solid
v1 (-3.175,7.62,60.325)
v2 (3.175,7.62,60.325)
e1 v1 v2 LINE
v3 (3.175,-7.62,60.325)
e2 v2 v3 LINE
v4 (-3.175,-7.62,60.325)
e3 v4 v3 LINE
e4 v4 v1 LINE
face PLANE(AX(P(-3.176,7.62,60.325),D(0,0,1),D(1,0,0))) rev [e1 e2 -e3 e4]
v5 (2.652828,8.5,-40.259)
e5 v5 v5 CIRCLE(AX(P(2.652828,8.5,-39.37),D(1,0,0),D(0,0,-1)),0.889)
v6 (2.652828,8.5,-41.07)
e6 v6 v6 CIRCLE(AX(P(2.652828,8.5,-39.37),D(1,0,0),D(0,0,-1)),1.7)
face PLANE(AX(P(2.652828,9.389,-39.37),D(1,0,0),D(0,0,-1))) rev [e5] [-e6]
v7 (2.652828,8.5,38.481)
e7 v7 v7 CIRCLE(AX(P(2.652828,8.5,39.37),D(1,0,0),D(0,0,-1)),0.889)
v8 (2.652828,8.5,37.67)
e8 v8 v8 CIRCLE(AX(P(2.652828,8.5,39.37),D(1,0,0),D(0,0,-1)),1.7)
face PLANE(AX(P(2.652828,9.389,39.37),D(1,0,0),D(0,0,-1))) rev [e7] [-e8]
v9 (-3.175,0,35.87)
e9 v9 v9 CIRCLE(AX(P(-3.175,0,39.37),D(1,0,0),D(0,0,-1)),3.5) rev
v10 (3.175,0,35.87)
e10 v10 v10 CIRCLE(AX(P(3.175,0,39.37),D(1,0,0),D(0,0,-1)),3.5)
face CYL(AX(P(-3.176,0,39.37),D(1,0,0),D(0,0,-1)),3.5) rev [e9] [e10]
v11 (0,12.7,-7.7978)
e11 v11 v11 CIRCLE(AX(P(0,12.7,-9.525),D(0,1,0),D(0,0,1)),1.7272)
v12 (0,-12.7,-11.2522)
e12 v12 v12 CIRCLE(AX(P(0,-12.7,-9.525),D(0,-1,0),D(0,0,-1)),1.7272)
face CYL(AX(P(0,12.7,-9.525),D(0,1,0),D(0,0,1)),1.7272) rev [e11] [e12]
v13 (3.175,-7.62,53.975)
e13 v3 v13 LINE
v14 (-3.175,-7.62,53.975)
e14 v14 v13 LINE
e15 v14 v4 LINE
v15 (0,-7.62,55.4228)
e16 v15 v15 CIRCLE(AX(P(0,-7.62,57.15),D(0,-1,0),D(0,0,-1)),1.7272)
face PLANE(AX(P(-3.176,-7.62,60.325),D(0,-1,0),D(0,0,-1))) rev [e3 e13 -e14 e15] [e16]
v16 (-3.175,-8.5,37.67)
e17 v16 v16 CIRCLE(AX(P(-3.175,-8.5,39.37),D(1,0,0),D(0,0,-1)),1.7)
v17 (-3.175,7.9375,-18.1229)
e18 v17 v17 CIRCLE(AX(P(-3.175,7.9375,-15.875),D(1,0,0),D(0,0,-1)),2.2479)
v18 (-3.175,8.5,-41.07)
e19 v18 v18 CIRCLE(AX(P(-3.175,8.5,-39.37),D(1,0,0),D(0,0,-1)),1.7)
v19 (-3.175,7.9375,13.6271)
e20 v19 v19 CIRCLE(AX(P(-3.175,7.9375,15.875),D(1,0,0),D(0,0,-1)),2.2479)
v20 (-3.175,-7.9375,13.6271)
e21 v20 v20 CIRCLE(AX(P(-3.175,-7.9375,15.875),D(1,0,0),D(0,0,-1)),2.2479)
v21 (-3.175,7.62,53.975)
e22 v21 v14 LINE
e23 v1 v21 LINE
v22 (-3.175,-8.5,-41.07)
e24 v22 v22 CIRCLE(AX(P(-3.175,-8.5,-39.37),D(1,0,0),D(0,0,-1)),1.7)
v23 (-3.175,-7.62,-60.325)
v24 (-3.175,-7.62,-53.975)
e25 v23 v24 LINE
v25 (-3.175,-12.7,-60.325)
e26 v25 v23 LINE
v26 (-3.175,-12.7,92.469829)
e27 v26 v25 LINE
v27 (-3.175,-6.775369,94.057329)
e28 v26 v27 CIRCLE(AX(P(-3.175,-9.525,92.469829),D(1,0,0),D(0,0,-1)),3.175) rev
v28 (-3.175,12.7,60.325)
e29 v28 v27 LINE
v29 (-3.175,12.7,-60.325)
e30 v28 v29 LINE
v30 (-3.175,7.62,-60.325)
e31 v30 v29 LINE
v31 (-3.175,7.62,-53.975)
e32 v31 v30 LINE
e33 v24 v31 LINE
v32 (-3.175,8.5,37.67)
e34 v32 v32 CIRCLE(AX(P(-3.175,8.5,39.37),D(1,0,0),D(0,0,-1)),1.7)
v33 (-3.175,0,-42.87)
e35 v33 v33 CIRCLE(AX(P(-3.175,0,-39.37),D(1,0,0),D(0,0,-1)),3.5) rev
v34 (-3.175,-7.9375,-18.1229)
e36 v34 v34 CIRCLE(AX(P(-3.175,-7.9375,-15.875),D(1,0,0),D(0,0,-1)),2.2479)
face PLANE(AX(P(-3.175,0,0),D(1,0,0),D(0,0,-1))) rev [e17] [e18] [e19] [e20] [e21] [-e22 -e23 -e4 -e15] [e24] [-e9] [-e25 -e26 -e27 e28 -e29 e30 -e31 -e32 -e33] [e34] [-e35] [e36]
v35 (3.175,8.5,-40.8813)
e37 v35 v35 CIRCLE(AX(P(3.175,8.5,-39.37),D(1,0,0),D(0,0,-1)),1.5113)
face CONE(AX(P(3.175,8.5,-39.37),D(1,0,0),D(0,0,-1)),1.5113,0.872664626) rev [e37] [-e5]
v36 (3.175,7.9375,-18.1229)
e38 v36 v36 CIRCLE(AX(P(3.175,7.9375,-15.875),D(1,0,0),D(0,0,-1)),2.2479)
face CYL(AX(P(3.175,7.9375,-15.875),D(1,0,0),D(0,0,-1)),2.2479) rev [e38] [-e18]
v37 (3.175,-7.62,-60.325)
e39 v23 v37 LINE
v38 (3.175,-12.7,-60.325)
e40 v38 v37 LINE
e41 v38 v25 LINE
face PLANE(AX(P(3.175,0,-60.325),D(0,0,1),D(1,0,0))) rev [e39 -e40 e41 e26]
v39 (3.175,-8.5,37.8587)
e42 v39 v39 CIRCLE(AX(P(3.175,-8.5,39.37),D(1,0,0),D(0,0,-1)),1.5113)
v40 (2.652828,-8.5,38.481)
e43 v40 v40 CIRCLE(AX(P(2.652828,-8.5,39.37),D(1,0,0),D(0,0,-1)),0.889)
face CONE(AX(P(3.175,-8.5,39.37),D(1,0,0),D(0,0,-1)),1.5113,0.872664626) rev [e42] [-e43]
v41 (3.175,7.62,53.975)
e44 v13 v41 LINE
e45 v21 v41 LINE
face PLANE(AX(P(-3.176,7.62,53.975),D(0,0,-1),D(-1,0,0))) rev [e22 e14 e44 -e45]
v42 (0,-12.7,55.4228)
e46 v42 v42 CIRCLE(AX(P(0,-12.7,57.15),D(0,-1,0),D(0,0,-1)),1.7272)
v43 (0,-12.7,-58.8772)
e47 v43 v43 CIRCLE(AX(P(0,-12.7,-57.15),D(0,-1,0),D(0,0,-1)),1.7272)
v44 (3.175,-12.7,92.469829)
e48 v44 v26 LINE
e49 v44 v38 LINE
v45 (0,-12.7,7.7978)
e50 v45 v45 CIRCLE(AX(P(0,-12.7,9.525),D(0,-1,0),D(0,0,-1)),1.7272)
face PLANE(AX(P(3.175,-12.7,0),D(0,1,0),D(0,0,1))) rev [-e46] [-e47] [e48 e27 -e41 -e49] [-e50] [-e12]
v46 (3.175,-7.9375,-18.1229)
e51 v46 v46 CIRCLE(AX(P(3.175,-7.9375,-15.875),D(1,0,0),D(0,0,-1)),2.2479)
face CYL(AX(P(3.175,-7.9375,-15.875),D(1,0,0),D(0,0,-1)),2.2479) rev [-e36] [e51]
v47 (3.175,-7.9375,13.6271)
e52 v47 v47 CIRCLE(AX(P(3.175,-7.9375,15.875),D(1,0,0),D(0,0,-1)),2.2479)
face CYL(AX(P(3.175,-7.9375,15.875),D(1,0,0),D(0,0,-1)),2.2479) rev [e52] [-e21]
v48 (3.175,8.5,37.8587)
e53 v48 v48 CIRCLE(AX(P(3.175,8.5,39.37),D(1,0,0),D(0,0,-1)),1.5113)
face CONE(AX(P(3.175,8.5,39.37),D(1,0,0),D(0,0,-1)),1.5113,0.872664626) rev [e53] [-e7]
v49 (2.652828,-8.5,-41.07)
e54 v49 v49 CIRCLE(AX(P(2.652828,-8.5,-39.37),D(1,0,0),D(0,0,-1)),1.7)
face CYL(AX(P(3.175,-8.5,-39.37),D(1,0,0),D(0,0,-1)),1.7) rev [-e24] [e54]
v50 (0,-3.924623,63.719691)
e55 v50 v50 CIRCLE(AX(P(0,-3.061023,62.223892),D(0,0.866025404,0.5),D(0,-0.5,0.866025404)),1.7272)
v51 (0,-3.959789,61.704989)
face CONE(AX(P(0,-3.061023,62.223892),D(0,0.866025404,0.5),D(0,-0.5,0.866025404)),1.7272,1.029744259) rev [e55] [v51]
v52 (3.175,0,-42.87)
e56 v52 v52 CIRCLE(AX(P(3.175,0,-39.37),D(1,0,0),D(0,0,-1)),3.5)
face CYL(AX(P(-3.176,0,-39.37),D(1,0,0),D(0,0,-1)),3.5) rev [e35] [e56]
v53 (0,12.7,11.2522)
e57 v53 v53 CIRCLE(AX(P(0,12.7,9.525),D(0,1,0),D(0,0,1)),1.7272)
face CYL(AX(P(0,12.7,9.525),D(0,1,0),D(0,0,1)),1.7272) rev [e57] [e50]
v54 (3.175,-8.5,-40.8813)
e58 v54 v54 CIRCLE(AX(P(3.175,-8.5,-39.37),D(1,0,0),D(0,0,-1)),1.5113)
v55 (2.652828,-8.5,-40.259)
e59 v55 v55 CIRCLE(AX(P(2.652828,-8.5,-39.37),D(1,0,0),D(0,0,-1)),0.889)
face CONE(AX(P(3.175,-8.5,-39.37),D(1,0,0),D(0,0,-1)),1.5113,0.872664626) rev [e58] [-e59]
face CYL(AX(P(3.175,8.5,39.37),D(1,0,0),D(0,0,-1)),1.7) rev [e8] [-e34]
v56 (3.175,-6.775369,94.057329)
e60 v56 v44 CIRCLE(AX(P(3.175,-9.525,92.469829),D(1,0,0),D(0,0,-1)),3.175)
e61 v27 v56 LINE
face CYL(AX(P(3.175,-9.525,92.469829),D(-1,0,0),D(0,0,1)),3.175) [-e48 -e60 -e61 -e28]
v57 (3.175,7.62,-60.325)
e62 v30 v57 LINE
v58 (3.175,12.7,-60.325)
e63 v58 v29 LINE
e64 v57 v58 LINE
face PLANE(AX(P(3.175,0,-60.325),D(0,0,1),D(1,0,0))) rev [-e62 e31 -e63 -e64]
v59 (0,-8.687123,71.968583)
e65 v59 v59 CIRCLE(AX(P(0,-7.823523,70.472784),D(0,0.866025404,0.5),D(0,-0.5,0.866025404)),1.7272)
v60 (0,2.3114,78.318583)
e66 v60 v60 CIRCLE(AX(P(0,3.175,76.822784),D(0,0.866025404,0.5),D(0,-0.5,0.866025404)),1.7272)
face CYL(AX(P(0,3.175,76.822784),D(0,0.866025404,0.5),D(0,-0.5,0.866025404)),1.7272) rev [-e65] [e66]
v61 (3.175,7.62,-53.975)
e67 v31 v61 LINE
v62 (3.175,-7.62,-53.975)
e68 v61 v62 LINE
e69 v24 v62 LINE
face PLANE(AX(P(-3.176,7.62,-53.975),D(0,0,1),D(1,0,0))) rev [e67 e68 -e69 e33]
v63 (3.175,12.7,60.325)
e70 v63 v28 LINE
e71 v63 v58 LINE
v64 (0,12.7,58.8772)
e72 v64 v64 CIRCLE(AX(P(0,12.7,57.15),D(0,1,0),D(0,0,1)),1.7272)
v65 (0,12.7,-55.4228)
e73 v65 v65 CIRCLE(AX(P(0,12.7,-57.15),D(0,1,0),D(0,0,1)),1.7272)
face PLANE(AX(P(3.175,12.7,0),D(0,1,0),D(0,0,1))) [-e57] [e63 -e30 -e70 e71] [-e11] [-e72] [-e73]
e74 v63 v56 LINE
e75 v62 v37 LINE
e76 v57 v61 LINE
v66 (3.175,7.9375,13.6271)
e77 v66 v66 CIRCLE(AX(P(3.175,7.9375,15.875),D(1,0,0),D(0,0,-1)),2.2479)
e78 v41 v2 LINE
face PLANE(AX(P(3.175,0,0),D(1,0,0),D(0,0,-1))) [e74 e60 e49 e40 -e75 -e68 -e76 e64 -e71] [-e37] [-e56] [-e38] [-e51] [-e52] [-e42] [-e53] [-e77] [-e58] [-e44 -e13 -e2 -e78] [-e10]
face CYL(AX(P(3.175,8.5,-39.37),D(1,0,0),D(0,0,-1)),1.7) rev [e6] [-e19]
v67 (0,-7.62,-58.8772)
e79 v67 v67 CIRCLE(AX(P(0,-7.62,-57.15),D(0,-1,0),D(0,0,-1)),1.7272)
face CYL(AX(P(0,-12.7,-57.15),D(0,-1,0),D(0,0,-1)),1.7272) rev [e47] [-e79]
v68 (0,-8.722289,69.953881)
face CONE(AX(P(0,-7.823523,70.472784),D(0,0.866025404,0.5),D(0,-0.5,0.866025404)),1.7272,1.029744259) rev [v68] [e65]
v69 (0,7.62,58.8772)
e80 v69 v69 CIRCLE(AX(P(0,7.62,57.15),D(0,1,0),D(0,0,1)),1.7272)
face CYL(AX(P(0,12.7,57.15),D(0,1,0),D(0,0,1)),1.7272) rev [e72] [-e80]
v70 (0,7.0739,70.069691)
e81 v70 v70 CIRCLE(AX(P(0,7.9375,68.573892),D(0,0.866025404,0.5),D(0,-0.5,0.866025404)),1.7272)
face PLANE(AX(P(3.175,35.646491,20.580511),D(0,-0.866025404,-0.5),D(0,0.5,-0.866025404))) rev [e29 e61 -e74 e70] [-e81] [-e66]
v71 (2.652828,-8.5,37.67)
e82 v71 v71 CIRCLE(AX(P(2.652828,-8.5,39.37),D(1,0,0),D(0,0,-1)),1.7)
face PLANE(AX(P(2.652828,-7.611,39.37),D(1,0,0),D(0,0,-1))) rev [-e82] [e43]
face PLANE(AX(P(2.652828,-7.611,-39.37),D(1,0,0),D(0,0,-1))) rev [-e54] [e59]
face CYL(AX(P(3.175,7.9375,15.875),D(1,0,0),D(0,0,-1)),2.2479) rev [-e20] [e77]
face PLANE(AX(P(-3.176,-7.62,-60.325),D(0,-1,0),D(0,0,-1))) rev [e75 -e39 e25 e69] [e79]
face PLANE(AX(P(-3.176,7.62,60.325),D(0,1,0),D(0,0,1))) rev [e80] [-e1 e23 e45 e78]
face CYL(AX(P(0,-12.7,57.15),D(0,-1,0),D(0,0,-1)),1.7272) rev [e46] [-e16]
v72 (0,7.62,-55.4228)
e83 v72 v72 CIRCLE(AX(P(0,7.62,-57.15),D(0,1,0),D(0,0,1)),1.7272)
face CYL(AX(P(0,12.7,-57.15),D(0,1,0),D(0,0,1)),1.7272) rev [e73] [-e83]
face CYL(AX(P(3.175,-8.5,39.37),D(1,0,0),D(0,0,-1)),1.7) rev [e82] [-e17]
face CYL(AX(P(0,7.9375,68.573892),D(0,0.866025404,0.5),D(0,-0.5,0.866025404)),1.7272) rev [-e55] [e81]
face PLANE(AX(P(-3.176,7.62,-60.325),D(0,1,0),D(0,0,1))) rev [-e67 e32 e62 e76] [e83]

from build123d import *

# Parameters (mm, degrees)
SKETCH1_W                          = 120.65
SKETCH1_H                          = 25.4
BOSS_EXTRUDE1_DEPTH                = 3.175
CUT_EXTRUDE1_REACH                 = 107.281
SKETCH4_R                          = 3.5
F_8_CLEARANCE_HOLE1_D              = 4.4958
FILLET3_R                          = 3.175
CUT_EXTRUDE3_REACH                 = 98.693
SKETCH12_W                         = 6.35
SKETCH12_H                         = 15.24
TAP_DRILL_FOR_8_32_TAP1_D          = 3.4544
TAP_DRILL_FOR_8_32_TAP1_DEPTH      = 12.7
TAP_DRILL_FOR_8_32_TAP1_TIP        = 1.037806461
TAP_DRILL_FOR_8_32_TAP2_AT_2_COUNT = 2
TAP_DRILL_FOR_8_32_TAP2_AT_2_PITCH = 47.625
TAP_DRILL_FOR_8_32_TAP2_AT_3_COUNT = 2
TAP_DRILL_FOR_8_32_TAP2_AT_3_PITCH = 66.675
TAP_DRILL_FOR_8_32_TAP2_AT_4_COUNT = 2
TAP_DRILL_FOR_8_32_TAP2_AT_4_PITCH = 114.3


# Read off the part's stored shape, not the designer's step: AdvancedHole1
with BuildPart() as part:
    # Sketch1 → Boss-Extrude1 (new, symmetric)
    with BuildSketch(Plane(origin=(0, 0, 0), x_dir=(0, 0, -1), z_dir=(1, 0, 0))):
        Rectangle(SKETCH1_W, SKETCH1_H)
        Polygon((-60.325, 12.7), (-104.319090512, -12.7), (-60.325, -12.7), align=None)
    extrude(amount=BOSS_EXTRUDE1_DEPTH, both=True)

    # Sketch4 → Cut-Extrude1 (cut, up to next)
    with BuildSketch(Plane(origin=(3.175, 0, 0), x_dir=(0, 0, -1), z_dir=(1, 0, 0)), mode=Mode.PRIVATE) as cut_extrude1_sk1:
        with Locations((-39.37, 0)):
            Circle(SKETCH4_R)
    cut_extrude1_tool1 = extrude(cut_extrude1_sk1.sketch, amount=-CUT_EXTRUDE1_REACH, mode=Mode.PRIVATE) & part.part
    # Sketch4 → Cut-Extrude1 (cut, up to next)
    with BuildSketch(Plane(origin=(3.175, 0, 0), x_dir=(0, 0, -1), z_dir=(1, 0, 0)), mode=Mode.PRIVATE) as cut_extrude1_sk2:
        with Locations((39.37, 0)):
            Circle(SKETCH4_R)
    cut_extrude1_tool2 = extrude(cut_extrude1_sk2.sketch, amount=-CUT_EXTRUDE1_REACH, mode=Mode.PRIVATE) & part.part
    add(cut_extrude1_tool1.solids().sort_by_distance((3.175, 0, 39.37))[0], mode=Mode.SUBTRACT)
    add(cut_extrude1_tool2.solids().sort_by_distance((3.175, 0, -39.37))[0], mode=Mode.SUBTRACT)

    # AdvancedHole1 outline → AdvancedHole1 (revolve, cut)
    with BuildSketch(Plane(origin=(0, -8.5, -39.37), x_dir=(0, 1, 0), z_dir=(0, 0, -1))):
        Polygon((0.889, 2.6528283), (1.5113, 3.175), (0, 3.175), (0, -3.175), (1.7, -3.175), (1.7, 2.6528283), align=None)
    revolve(axis=Axis((0, -8.5, -39.37), (1, 0, 0)), mode=Mode.SUBTRACT)

    # AdvancedHole1 2 outline → AdvancedHole1 2 (revolve, cut)
    with BuildSketch(Plane(origin=(0, 8.5, -39.37), x_dir=(0, 1, 0), z_dir=(0, 0, -1))):
        Polygon((0.889, 2.6528283), (1.5113, 3.175), (0, 3.175), (0, -3.175), (1.7, -3.175), (1.7, 2.6528283), align=None)
    revolve(axis=Axis((0, 8.5, -39.37), (1, 0, 0)), mode=Mode.SUBTRACT)

    # AdvancedHole1 3 outline → AdvancedHole1 3 (revolve, cut)
    with BuildSketch(Plane(origin=(0, -8.5, 39.37), x_dir=(0, 1, 0), z_dir=(0, 0, -1))):
        Polygon((0.889, 2.6528283), (1.5113, 3.175), (0, 3.175), (0, -3.175), (1.7, -3.175), (1.7, 2.6528283), align=None)
    revolve(axis=Axis((0, -8.5, 39.37), (1, 0, 0)), mode=Mode.SUBTRACT)

    # AdvancedHole1 4 outline → AdvancedHole1 4 (revolve, cut)
    with BuildSketch(Plane(origin=(0, 8.5, 39.37), x_dir=(0, 1, 0), z_dir=(0, 0, -1))):
        Polygon((0.889, 2.6528283), (1.5113, 3.175), (0, 3.175), (0, -3.175), (1.7, -3.175), (1.7, 2.6528283), align=None)
    revolve(axis=Axis((0, 8.5, 39.37), (1, 0, 0)), mode=Mode.SUBTRACT)

    # #8 Clearance Hole1 (through all)
    with Locations(Plane(origin=(3.175, 0, 0), x_dir=(0, 0, -1), z_dir=(1, 0, 0))):
        with Locations((-15.875, 7.9375), (-15.875, -7.9375), (15.875, -7.9375), (15.875, 7.9375)):
            Hole(F_8_CLEARANCE_HOLE1_D / 2)

    # Fillet3
    fillet3_edges = [part.edges().sort_by_distance(p)[0] for p in [
        (0, -12.7, 104.319090512),
    ]]
    fillet(fillet3_edges, radius=FILLET3_R)

    # Sketch12 → Cut-Extrude3 (cut, up to next)
    with BuildSketch(Plane(origin=(3.175, 0, 0), x_dir=(0, 0, -1), z_dir=(1, 0, 0)), mode=Mode.PRIVATE) as cut_extrude3_sk1:
        with Locations((-57.15, 0)):
            Rectangle(SKETCH12_W, SKETCH12_H)
    cut_extrude3_tool1 = extrude(cut_extrude3_sk1.sketch, amount=-CUT_EXTRUDE3_REACH, mode=Mode.PRIVATE) & part.part
    # Sketch12 → Cut-Extrude3 (cut, up to next)
    with BuildSketch(Plane(origin=(3.175, 0, 0), x_dir=(0, 0, -1), z_dir=(1, 0, 0)), mode=Mode.PRIVATE) as cut_extrude3_sk2:
        with Locations((57.15, 0)):
            Rectangle(SKETCH12_W, SKETCH12_H)
    cut_extrude3_tool2 = extrude(cut_extrude3_sk2.sketch, amount=-CUT_EXTRUDE3_REACH, mode=Mode.PRIVATE) & part.part
    add(cut_extrude3_tool1.solids().sort_by_distance((3.175, 0, 57.15))[0], mode=Mode.SUBTRACT)
    add(cut_extrude3_tool2.solids().sort_by_distance((3.175, 0, -57.15))[0], mode=Mode.SUBTRACT)

    # Tap Drill for #8-32 Tap1
    with Locations(Plane(origin=(0, 35.646491242, 20.580511314), x_dir=(1, 0, 0), z_dir=(0, 0.8660254037844417, 0.4999999999999949))):
        with Locations((0, -64.942982483), (0, -55.417982483)):
            Hole(TAP_DRILL_FOR_8_32_TAP1_D / 2, depth=TAP_DRILL_FOR_8_32_TAP1_DEPTH)
            with Locations((0, 0, -(TAP_DRILL_FOR_8_32_TAP1_DEPTH + TAP_DRILL_FOR_8_32_TAP1_TIP / 2))):  # 118° drill point
                Cone(0, TAP_DRILL_FOR_8_32_TAP1_D / 2, TAP_DRILL_FOR_8_32_TAP1_TIP, mode=Mode.SUBTRACT)

    # Sketch20 → Tap Drill for #8-32 Tap2 (revolve, cut)
    with BuildSketch(Plane(origin=(0, 12.7, 57.15), x_dir=(0, 0, 1), z_dir=(1, 0, 0))):
        Polygon((0, 0), (0, 13.737806461), (1.7272, 12.7), (1.7272, 0), align=None)
    tap_drill_for_8_32_tap2 = revolve(axis=Axis((0, 19.05, 57.15), (0, -1, 0)), mode=Mode.SUBTRACT)

    # Tap Drill for #8-32 Tap2 at 2: Tap Drill for #8-32 Tap2 ×2
    with Locations(*[(0, 0, -i * TAP_DRILL_FOR_8_32_TAP2_AT_2_PITCH) for i in range(1, TAP_DRILL_FOR_8_32_TAP2_AT_2_COUNT)]):
        add(tap_drill_for_8_32_tap2, mode=Mode.SUBTRACT)

    # Tap Drill for #8-32 Tap2 at 3: Tap Drill for #8-32 Tap2 ×2
    with Locations(*[(0, 0, -i * TAP_DRILL_FOR_8_32_TAP2_AT_3_PITCH) for i in range(1, TAP_DRILL_FOR_8_32_TAP2_AT_3_COUNT)]):
        add(tap_drill_for_8_32_tap2, mode=Mode.SUBTRACT)

    # Tap Drill for #8-32 Tap2 at 4: Tap Drill for #8-32 Tap2 ×2
    with Locations(*[(0, 0, -i * TAP_DRILL_FOR_8_32_TAP2_AT_4_PITCH) for i in range(1, TAP_DRILL_FOR_8_32_TAP2_AT_4_COUNT)]):
        add(tap_drill_for_8_32_tap2, mode=Mode.SUBTRACT)

    # Mirror1: Tap Drill for #8-32 Tap2 across plane
    add(tap_drill_for_8_32_tap2.mirror(Plane.ZX), mode=Mode.SUBTRACT)

    # Mirror1 copy 1 sketch → Mirror1 copy 1 (revolve, cut)
    with BuildSketch(Plane(origin=(0, -12.7, 9.525), x_dir=(0, 0, 1), z_dir=(1, 0, 0))):
        Polygon((0, 0), (0, -13.737806461), (1.7272, -12.7), (1.7272, 0), align=None)
    revolve(axis=Axis((0, -19.05, 9.525), (0, -1, 0)), mode=Mode.SUBTRACT)

    # Mirror1 copy 2 sketch → Mirror1 copy 2 (revolve, cut)
    with BuildSketch(Plane(origin=(0, -12.7, -9.525), x_dir=(0, 0, 1), z_dir=(1, 0, 0))):
        Polygon((0, 0), (0, -13.737806461), (1.7272, -12.7), (1.7272, 0), align=None)
    revolve(axis=Axis((0, -19.05, -9.525), (0, -1, 0)), mode=Mode.SUBTRACT)

    # Mirror1 copy 3 sketch → Mirror1 copy 3 (revolve, cut)
    with BuildSketch(Plane(origin=(0, -12.7, -57.15), x_dir=(0, 0, 1), z_dir=(1, 0, 0))):
        Polygon((0, 0), (0, -13.737806461), (1.7272, -12.7), (1.7272, 0), align=None)
    revolve(axis=Axis((0, -19.05, -57.15), (0, -1, 0)), mode=Mode.SUBTRACT)


solid = part.part
